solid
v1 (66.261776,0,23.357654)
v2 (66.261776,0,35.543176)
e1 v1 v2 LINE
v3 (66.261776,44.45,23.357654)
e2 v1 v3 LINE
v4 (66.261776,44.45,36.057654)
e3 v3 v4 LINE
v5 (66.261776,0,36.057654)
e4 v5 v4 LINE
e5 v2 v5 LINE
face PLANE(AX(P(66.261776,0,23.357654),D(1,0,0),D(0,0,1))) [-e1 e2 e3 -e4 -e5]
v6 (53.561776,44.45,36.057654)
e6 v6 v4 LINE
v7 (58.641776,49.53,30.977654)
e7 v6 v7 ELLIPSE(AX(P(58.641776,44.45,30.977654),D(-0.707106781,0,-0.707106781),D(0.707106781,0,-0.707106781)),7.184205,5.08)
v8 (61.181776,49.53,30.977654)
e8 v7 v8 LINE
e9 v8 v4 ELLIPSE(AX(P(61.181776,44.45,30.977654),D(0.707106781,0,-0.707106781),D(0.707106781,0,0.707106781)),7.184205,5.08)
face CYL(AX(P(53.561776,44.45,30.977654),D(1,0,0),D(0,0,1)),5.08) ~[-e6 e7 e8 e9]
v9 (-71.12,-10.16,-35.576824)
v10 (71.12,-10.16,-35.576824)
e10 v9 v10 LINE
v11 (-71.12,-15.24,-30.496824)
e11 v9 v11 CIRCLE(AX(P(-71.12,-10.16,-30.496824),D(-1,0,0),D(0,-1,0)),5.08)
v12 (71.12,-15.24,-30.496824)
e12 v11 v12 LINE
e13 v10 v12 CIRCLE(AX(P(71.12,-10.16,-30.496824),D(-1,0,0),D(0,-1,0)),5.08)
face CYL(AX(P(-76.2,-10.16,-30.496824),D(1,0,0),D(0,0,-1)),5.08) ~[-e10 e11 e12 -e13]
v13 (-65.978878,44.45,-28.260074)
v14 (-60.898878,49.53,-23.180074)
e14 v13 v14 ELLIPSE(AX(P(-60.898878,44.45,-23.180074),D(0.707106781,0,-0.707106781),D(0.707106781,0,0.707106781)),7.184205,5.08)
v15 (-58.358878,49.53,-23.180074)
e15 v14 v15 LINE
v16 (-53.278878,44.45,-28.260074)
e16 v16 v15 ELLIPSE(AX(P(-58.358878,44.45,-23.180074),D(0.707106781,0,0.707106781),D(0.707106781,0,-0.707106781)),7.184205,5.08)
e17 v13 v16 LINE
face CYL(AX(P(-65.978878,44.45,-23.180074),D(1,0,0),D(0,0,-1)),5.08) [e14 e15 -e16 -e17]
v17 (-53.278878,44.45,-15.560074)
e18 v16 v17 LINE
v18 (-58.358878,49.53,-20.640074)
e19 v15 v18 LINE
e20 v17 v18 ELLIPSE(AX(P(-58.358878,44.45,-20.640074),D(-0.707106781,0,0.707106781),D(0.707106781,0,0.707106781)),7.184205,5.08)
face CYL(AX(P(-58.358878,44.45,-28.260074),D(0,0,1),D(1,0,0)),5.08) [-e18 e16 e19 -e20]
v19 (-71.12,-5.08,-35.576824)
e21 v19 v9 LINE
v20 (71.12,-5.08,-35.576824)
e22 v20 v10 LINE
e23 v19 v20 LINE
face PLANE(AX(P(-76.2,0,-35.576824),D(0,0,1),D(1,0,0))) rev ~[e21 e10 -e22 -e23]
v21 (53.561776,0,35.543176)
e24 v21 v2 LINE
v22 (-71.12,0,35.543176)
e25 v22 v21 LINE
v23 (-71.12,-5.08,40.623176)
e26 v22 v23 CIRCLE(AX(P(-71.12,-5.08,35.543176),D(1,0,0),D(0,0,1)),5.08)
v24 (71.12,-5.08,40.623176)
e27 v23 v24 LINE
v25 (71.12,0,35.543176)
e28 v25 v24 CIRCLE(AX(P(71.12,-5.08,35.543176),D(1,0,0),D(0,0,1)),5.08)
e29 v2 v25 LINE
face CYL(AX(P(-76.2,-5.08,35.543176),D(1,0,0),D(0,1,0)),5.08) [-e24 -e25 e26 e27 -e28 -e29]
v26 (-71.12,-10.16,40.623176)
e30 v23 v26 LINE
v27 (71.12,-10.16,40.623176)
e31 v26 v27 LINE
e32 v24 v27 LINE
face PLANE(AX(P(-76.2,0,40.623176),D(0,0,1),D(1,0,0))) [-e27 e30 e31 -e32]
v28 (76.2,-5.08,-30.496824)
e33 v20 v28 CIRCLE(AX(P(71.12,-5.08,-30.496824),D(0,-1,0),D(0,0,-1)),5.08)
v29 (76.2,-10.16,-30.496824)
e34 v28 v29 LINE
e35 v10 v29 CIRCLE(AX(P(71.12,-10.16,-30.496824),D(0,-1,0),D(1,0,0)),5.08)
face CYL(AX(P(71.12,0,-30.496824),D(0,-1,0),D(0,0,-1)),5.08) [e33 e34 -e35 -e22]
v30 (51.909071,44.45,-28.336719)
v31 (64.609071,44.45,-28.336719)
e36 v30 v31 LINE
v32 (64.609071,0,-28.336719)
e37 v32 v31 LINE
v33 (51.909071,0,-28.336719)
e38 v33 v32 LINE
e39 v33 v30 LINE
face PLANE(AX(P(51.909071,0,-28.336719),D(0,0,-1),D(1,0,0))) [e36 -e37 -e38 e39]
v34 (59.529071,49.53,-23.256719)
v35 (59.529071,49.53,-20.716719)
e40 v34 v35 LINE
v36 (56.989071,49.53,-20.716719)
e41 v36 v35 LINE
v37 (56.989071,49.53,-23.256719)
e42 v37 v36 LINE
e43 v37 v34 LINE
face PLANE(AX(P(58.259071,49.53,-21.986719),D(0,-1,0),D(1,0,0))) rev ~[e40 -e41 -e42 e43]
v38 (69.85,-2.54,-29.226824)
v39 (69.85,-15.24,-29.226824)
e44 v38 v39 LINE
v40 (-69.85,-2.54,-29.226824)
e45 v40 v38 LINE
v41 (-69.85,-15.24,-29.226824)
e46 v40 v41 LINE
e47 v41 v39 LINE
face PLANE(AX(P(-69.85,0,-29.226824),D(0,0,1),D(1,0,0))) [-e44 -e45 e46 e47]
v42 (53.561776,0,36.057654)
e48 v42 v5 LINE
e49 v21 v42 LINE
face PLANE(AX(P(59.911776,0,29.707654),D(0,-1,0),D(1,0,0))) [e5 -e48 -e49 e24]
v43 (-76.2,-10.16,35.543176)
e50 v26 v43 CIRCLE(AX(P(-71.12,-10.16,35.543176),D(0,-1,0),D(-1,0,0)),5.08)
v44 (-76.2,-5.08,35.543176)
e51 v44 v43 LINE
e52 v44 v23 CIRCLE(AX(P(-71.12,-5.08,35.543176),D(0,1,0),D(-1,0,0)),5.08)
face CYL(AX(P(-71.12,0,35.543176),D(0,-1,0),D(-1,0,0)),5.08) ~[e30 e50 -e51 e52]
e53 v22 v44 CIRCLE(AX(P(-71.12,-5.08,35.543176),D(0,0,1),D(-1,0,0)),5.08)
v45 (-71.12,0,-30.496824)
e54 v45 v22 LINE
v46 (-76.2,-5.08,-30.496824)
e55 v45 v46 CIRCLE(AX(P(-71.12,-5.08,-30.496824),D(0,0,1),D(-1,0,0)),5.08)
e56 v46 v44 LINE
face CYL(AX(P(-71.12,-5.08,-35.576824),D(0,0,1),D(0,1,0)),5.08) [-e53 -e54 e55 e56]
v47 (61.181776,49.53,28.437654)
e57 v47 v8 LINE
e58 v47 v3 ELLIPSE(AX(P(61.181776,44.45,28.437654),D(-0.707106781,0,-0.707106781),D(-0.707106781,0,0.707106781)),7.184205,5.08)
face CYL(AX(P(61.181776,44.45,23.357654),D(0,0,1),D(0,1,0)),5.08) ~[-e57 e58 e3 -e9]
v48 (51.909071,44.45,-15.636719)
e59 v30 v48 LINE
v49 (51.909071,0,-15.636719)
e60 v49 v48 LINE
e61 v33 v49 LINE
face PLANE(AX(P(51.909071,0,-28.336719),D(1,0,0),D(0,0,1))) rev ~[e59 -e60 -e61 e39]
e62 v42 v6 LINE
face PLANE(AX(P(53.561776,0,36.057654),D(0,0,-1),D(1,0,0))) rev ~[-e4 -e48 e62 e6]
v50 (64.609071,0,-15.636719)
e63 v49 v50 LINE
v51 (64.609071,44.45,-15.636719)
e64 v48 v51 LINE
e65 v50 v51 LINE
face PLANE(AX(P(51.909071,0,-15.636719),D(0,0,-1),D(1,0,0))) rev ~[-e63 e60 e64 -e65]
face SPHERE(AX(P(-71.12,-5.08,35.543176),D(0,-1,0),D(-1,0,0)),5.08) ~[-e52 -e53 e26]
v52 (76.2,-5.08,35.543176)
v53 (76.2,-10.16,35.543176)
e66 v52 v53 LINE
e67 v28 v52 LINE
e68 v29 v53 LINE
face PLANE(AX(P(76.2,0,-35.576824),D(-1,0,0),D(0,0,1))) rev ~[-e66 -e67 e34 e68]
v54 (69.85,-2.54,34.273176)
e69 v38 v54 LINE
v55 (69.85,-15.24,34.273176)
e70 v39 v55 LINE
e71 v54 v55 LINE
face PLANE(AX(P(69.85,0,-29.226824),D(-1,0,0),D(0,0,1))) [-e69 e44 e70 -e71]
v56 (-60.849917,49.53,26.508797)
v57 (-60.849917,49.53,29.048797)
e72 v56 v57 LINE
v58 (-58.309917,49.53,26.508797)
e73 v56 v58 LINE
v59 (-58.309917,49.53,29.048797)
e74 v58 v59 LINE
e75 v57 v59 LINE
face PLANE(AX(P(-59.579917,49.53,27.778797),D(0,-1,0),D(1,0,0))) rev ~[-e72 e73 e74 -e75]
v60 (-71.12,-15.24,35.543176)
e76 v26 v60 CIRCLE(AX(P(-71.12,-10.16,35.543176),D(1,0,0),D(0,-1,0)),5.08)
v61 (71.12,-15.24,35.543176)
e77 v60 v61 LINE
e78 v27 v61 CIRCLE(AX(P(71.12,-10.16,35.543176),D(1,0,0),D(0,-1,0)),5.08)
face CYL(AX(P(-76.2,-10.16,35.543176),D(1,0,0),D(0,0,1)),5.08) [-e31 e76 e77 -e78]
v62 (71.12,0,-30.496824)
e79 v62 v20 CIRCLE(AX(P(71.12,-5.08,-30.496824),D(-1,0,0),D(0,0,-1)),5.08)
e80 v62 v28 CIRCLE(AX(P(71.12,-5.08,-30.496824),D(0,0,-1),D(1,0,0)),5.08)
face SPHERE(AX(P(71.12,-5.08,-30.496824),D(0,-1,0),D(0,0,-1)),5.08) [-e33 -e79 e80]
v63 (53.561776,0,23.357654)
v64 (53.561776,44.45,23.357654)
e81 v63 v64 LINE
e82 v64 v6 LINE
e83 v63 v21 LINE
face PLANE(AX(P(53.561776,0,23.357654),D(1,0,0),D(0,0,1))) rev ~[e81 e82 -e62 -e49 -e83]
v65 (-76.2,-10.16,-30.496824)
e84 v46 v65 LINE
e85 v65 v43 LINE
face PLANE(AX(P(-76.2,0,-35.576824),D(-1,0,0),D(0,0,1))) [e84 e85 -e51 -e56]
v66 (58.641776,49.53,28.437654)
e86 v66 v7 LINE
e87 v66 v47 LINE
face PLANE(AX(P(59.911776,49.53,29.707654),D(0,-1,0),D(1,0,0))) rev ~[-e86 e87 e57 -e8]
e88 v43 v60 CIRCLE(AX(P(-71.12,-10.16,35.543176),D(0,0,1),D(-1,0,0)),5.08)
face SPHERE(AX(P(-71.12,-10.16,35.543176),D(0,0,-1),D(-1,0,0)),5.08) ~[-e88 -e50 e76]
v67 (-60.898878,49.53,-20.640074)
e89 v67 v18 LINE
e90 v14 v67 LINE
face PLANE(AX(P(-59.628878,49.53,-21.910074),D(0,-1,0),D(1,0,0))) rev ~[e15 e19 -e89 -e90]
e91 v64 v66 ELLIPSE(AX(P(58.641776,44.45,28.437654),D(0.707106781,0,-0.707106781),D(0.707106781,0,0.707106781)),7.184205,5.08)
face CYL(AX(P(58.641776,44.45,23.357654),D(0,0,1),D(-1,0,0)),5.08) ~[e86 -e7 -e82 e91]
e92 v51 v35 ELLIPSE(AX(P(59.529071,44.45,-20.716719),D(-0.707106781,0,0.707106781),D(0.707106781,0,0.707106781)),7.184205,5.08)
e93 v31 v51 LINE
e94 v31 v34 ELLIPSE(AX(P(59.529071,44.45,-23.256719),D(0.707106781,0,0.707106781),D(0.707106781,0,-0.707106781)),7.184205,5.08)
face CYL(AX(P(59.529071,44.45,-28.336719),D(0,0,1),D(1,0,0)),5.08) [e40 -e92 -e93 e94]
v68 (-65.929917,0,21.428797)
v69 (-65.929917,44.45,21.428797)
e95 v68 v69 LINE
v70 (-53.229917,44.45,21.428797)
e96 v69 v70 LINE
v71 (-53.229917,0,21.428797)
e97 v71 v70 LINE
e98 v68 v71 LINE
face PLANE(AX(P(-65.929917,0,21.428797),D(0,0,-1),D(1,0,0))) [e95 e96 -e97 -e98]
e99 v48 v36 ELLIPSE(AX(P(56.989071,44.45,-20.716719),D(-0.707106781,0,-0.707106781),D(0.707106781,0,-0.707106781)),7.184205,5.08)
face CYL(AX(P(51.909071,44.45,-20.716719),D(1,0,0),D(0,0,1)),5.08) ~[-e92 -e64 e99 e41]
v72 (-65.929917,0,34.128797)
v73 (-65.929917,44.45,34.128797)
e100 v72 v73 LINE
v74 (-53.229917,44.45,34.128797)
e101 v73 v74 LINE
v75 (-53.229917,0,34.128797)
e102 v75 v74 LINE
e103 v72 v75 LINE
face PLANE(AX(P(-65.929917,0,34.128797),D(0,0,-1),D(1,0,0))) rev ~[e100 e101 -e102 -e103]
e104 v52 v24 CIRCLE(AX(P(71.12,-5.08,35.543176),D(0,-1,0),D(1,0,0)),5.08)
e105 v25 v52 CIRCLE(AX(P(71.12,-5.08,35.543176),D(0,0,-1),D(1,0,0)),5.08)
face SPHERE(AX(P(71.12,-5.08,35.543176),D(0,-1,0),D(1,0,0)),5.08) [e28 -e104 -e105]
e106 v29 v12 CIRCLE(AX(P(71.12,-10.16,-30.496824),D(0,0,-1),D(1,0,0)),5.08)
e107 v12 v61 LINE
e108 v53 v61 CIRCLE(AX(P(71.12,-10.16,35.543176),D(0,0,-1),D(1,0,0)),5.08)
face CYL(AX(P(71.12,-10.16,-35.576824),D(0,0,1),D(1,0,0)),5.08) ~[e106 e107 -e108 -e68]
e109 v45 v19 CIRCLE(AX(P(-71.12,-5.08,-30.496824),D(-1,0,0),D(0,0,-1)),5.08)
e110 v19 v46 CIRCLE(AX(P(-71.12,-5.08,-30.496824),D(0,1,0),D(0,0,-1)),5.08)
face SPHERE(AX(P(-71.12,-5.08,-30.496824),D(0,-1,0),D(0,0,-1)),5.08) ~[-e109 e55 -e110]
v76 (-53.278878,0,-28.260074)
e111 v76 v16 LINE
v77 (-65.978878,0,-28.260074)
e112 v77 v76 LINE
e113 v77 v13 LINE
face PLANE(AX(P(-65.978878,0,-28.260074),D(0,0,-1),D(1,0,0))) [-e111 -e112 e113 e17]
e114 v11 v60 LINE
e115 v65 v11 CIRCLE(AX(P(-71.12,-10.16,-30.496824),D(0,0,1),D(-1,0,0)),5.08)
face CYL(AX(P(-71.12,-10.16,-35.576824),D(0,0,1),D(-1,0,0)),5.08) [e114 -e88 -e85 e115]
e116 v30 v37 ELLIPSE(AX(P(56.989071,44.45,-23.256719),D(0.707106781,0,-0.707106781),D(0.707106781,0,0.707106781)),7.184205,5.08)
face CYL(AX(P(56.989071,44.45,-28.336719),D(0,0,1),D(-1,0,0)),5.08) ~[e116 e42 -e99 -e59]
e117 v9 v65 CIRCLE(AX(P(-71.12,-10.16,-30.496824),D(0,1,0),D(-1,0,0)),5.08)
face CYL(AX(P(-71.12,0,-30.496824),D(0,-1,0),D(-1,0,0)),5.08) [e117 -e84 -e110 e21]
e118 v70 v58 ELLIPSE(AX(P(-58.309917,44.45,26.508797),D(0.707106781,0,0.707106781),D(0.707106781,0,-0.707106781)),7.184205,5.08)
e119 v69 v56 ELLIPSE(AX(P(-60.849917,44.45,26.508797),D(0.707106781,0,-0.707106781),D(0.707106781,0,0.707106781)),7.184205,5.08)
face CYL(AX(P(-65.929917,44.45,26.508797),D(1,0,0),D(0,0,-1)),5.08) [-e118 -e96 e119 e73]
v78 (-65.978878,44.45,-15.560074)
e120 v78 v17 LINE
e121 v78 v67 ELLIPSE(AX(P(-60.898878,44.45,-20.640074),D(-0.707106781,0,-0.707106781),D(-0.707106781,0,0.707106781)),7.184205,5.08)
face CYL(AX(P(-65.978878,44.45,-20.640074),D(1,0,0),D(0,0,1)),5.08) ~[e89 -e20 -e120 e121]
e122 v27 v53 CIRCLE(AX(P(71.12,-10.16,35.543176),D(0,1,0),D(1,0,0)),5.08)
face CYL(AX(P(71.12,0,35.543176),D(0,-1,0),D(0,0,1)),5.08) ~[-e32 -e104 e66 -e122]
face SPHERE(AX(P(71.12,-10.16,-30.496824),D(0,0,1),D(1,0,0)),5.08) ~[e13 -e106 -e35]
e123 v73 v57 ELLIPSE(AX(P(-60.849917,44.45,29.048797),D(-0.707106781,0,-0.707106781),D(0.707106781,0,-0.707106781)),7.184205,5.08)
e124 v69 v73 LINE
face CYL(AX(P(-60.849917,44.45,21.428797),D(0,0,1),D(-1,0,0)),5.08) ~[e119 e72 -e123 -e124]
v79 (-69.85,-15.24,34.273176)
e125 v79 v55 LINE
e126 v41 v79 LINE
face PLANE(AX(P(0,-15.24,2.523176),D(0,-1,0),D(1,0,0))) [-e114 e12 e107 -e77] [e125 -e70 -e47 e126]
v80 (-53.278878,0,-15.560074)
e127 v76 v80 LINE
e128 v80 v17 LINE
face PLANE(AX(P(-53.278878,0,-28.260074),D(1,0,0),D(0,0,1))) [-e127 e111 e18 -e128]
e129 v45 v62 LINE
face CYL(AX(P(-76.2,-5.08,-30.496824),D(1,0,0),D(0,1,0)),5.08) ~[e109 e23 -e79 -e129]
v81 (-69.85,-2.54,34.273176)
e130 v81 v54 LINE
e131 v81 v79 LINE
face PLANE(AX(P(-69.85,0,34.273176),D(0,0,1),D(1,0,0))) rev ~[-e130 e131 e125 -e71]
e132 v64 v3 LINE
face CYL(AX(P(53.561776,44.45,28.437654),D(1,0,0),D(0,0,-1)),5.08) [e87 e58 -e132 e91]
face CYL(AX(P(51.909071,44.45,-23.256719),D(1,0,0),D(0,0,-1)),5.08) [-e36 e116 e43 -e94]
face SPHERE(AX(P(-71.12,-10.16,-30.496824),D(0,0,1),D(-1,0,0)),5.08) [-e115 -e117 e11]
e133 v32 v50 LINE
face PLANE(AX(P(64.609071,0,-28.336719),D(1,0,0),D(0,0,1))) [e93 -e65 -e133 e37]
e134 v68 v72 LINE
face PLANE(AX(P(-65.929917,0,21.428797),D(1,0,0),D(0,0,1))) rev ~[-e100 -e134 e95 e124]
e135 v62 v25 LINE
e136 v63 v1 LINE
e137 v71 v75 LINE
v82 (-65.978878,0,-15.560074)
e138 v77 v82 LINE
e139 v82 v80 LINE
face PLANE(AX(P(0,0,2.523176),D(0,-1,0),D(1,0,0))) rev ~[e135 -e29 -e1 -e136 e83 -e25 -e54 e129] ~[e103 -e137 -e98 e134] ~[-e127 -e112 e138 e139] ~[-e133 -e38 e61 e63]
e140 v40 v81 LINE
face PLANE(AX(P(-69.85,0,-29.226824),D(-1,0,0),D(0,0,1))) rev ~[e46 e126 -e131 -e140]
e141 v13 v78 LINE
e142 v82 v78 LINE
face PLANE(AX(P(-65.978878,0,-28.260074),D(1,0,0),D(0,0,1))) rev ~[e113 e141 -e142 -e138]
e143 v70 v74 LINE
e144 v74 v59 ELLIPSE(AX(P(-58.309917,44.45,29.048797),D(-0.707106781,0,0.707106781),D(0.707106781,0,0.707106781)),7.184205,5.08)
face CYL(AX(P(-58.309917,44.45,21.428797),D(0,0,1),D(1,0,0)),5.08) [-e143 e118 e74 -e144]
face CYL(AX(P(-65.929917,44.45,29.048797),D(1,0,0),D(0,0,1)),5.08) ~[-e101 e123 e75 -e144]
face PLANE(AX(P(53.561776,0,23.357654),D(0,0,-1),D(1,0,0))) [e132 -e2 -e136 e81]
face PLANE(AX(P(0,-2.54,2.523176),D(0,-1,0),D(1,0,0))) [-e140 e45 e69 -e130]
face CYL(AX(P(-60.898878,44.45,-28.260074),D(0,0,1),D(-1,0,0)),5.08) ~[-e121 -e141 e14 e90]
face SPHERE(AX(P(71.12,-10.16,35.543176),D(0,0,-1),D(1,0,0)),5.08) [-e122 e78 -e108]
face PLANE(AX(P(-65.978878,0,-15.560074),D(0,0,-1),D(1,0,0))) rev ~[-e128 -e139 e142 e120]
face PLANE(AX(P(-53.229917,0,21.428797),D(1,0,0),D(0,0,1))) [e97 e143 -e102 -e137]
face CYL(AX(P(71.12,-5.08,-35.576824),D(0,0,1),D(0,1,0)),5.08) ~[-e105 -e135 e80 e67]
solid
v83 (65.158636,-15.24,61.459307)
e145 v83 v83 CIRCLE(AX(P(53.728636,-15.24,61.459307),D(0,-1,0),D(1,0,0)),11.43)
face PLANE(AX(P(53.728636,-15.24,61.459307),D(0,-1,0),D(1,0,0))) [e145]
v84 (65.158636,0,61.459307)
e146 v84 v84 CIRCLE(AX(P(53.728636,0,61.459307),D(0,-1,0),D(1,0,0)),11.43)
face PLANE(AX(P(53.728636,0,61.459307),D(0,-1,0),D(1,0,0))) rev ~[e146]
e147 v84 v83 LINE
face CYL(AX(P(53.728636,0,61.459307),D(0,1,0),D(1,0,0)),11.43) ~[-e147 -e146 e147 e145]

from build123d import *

# Parameters (mm, degrees)
F0_W     = 152.4
F0_H     = 76.2
F0_W_2   = 139.7
F0_H_2   = 63.5
F1_DEPTH = 15.24
F0_R     = 11.43
F2_DEPTH = 2.54
F3_R     = 5.08
F4_W     = 12.7
F4_H     = 12.7
F5_DEPTH = 49.53
F6_R     = 5.08


# Not quite as in the source:
# - a feature names something its author has since deleted; it is built from what else it names


with BuildPart() as f1:
    # F0 (on Front) → F1 (new body)
    with BuildSketch(Plane.XZ):
        with Locations((0, 2.523175699)):
            Rectangle(F0_W, F0_H)
        with Locations((0, 2.523175699)):
            Rectangle(F0_W_2, F0_H_2, mode=Mode.SUBTRACT)
    extrude(amount=F1_DEPTH)

    # F0 (on Front) → F2 (join)
    with BuildSketch(Plane.XZ):
        with Locations((0, 2.523175699)):
            Rectangle(F0_W_2, F0_H_2)
    extrude(amount=F2_DEPTH)

    # F3
    f3_edges = [f1.edges().sort_by_distance(p)[0] for p in [
        (-76.2, -15.24, 2.523176),
        (76.2, -15.24, 2.523176),
        (-76.2, -7.62, -35.576824),
        (76.2, -7.62, -35.576824),
        (0, 0, -35.576824),
        (0, -15.24, -35.576824),
        (76.2, -7.62, 40.623176),
        (76.2, 0, 2.523176),
        (-76.2, -7.62, 40.623176),
        (-76.2, 0, 2.523176),
        (0, 0, 40.623176),
        (0, -15.24, 40.623176),
    ]]
    fillet(f3_edges, radius=F3_R)

    # F4 (on Front) → F5 (join)
    with BuildSketch(Plane.XZ):
        with Locations((59.9117761264, 29.707653685)):
            Rectangle(F4_W, F4_H)
        with Locations((58.2590709269, -21.9867194656)):
            Rectangle(F4_W, F4_H)
        with Locations((-59.6288775811, -21.9100740052)):
            Rectangle(F4_W, F4_H)
        with Locations((-59.5799170583, 27.7787972095)):
            Rectangle(F4_W, F4_H)
    extrude(amount=-F5_DEPTH)

    # F6
    f6_edges = [f1.edges().sort_by_distance(p)[0] for p in [
        (58.259071, 49.53, -15.636719),
        (51.909071, 49.53, -21.986719),
        (58.259071, 49.53, -28.336719),
        (64.609071, 49.53, -21.986719),
        (-65.978878, 49.53, -21.910074),
        (-59.628878, 49.53, -28.260074),
        (-53.278878, 49.53, -21.910074),
        (-59.628878, 49.53, -15.560074),
        (66.261776, 49.53, 29.707654),
        (59.911776, 49.53, 36.057654),
        (53.561776, 49.53, 29.707654),
        (59.911776, 49.53, 23.357654),
        (-59.579917, 49.53, 34.128797),
        (-65.929917, 49.53, 27.778797),
        (-59.579917, 49.53, 21.428797),
        (-53.229917, 49.53, 27.778797),
    ]]
    fillet(f6_edges, radius=F6_R)


with BuildPart() as f1b:
    # F0 (on Front) → F1, piece 2 (new body)
    with BuildSketch(Plane.XZ):
        with Locations((53.7286363542, 61.4593066275)):
            Circle(F0_R)
    extrude(amount=F1_DEPTH)


solid = Compound([f1.part, f1b.part])
